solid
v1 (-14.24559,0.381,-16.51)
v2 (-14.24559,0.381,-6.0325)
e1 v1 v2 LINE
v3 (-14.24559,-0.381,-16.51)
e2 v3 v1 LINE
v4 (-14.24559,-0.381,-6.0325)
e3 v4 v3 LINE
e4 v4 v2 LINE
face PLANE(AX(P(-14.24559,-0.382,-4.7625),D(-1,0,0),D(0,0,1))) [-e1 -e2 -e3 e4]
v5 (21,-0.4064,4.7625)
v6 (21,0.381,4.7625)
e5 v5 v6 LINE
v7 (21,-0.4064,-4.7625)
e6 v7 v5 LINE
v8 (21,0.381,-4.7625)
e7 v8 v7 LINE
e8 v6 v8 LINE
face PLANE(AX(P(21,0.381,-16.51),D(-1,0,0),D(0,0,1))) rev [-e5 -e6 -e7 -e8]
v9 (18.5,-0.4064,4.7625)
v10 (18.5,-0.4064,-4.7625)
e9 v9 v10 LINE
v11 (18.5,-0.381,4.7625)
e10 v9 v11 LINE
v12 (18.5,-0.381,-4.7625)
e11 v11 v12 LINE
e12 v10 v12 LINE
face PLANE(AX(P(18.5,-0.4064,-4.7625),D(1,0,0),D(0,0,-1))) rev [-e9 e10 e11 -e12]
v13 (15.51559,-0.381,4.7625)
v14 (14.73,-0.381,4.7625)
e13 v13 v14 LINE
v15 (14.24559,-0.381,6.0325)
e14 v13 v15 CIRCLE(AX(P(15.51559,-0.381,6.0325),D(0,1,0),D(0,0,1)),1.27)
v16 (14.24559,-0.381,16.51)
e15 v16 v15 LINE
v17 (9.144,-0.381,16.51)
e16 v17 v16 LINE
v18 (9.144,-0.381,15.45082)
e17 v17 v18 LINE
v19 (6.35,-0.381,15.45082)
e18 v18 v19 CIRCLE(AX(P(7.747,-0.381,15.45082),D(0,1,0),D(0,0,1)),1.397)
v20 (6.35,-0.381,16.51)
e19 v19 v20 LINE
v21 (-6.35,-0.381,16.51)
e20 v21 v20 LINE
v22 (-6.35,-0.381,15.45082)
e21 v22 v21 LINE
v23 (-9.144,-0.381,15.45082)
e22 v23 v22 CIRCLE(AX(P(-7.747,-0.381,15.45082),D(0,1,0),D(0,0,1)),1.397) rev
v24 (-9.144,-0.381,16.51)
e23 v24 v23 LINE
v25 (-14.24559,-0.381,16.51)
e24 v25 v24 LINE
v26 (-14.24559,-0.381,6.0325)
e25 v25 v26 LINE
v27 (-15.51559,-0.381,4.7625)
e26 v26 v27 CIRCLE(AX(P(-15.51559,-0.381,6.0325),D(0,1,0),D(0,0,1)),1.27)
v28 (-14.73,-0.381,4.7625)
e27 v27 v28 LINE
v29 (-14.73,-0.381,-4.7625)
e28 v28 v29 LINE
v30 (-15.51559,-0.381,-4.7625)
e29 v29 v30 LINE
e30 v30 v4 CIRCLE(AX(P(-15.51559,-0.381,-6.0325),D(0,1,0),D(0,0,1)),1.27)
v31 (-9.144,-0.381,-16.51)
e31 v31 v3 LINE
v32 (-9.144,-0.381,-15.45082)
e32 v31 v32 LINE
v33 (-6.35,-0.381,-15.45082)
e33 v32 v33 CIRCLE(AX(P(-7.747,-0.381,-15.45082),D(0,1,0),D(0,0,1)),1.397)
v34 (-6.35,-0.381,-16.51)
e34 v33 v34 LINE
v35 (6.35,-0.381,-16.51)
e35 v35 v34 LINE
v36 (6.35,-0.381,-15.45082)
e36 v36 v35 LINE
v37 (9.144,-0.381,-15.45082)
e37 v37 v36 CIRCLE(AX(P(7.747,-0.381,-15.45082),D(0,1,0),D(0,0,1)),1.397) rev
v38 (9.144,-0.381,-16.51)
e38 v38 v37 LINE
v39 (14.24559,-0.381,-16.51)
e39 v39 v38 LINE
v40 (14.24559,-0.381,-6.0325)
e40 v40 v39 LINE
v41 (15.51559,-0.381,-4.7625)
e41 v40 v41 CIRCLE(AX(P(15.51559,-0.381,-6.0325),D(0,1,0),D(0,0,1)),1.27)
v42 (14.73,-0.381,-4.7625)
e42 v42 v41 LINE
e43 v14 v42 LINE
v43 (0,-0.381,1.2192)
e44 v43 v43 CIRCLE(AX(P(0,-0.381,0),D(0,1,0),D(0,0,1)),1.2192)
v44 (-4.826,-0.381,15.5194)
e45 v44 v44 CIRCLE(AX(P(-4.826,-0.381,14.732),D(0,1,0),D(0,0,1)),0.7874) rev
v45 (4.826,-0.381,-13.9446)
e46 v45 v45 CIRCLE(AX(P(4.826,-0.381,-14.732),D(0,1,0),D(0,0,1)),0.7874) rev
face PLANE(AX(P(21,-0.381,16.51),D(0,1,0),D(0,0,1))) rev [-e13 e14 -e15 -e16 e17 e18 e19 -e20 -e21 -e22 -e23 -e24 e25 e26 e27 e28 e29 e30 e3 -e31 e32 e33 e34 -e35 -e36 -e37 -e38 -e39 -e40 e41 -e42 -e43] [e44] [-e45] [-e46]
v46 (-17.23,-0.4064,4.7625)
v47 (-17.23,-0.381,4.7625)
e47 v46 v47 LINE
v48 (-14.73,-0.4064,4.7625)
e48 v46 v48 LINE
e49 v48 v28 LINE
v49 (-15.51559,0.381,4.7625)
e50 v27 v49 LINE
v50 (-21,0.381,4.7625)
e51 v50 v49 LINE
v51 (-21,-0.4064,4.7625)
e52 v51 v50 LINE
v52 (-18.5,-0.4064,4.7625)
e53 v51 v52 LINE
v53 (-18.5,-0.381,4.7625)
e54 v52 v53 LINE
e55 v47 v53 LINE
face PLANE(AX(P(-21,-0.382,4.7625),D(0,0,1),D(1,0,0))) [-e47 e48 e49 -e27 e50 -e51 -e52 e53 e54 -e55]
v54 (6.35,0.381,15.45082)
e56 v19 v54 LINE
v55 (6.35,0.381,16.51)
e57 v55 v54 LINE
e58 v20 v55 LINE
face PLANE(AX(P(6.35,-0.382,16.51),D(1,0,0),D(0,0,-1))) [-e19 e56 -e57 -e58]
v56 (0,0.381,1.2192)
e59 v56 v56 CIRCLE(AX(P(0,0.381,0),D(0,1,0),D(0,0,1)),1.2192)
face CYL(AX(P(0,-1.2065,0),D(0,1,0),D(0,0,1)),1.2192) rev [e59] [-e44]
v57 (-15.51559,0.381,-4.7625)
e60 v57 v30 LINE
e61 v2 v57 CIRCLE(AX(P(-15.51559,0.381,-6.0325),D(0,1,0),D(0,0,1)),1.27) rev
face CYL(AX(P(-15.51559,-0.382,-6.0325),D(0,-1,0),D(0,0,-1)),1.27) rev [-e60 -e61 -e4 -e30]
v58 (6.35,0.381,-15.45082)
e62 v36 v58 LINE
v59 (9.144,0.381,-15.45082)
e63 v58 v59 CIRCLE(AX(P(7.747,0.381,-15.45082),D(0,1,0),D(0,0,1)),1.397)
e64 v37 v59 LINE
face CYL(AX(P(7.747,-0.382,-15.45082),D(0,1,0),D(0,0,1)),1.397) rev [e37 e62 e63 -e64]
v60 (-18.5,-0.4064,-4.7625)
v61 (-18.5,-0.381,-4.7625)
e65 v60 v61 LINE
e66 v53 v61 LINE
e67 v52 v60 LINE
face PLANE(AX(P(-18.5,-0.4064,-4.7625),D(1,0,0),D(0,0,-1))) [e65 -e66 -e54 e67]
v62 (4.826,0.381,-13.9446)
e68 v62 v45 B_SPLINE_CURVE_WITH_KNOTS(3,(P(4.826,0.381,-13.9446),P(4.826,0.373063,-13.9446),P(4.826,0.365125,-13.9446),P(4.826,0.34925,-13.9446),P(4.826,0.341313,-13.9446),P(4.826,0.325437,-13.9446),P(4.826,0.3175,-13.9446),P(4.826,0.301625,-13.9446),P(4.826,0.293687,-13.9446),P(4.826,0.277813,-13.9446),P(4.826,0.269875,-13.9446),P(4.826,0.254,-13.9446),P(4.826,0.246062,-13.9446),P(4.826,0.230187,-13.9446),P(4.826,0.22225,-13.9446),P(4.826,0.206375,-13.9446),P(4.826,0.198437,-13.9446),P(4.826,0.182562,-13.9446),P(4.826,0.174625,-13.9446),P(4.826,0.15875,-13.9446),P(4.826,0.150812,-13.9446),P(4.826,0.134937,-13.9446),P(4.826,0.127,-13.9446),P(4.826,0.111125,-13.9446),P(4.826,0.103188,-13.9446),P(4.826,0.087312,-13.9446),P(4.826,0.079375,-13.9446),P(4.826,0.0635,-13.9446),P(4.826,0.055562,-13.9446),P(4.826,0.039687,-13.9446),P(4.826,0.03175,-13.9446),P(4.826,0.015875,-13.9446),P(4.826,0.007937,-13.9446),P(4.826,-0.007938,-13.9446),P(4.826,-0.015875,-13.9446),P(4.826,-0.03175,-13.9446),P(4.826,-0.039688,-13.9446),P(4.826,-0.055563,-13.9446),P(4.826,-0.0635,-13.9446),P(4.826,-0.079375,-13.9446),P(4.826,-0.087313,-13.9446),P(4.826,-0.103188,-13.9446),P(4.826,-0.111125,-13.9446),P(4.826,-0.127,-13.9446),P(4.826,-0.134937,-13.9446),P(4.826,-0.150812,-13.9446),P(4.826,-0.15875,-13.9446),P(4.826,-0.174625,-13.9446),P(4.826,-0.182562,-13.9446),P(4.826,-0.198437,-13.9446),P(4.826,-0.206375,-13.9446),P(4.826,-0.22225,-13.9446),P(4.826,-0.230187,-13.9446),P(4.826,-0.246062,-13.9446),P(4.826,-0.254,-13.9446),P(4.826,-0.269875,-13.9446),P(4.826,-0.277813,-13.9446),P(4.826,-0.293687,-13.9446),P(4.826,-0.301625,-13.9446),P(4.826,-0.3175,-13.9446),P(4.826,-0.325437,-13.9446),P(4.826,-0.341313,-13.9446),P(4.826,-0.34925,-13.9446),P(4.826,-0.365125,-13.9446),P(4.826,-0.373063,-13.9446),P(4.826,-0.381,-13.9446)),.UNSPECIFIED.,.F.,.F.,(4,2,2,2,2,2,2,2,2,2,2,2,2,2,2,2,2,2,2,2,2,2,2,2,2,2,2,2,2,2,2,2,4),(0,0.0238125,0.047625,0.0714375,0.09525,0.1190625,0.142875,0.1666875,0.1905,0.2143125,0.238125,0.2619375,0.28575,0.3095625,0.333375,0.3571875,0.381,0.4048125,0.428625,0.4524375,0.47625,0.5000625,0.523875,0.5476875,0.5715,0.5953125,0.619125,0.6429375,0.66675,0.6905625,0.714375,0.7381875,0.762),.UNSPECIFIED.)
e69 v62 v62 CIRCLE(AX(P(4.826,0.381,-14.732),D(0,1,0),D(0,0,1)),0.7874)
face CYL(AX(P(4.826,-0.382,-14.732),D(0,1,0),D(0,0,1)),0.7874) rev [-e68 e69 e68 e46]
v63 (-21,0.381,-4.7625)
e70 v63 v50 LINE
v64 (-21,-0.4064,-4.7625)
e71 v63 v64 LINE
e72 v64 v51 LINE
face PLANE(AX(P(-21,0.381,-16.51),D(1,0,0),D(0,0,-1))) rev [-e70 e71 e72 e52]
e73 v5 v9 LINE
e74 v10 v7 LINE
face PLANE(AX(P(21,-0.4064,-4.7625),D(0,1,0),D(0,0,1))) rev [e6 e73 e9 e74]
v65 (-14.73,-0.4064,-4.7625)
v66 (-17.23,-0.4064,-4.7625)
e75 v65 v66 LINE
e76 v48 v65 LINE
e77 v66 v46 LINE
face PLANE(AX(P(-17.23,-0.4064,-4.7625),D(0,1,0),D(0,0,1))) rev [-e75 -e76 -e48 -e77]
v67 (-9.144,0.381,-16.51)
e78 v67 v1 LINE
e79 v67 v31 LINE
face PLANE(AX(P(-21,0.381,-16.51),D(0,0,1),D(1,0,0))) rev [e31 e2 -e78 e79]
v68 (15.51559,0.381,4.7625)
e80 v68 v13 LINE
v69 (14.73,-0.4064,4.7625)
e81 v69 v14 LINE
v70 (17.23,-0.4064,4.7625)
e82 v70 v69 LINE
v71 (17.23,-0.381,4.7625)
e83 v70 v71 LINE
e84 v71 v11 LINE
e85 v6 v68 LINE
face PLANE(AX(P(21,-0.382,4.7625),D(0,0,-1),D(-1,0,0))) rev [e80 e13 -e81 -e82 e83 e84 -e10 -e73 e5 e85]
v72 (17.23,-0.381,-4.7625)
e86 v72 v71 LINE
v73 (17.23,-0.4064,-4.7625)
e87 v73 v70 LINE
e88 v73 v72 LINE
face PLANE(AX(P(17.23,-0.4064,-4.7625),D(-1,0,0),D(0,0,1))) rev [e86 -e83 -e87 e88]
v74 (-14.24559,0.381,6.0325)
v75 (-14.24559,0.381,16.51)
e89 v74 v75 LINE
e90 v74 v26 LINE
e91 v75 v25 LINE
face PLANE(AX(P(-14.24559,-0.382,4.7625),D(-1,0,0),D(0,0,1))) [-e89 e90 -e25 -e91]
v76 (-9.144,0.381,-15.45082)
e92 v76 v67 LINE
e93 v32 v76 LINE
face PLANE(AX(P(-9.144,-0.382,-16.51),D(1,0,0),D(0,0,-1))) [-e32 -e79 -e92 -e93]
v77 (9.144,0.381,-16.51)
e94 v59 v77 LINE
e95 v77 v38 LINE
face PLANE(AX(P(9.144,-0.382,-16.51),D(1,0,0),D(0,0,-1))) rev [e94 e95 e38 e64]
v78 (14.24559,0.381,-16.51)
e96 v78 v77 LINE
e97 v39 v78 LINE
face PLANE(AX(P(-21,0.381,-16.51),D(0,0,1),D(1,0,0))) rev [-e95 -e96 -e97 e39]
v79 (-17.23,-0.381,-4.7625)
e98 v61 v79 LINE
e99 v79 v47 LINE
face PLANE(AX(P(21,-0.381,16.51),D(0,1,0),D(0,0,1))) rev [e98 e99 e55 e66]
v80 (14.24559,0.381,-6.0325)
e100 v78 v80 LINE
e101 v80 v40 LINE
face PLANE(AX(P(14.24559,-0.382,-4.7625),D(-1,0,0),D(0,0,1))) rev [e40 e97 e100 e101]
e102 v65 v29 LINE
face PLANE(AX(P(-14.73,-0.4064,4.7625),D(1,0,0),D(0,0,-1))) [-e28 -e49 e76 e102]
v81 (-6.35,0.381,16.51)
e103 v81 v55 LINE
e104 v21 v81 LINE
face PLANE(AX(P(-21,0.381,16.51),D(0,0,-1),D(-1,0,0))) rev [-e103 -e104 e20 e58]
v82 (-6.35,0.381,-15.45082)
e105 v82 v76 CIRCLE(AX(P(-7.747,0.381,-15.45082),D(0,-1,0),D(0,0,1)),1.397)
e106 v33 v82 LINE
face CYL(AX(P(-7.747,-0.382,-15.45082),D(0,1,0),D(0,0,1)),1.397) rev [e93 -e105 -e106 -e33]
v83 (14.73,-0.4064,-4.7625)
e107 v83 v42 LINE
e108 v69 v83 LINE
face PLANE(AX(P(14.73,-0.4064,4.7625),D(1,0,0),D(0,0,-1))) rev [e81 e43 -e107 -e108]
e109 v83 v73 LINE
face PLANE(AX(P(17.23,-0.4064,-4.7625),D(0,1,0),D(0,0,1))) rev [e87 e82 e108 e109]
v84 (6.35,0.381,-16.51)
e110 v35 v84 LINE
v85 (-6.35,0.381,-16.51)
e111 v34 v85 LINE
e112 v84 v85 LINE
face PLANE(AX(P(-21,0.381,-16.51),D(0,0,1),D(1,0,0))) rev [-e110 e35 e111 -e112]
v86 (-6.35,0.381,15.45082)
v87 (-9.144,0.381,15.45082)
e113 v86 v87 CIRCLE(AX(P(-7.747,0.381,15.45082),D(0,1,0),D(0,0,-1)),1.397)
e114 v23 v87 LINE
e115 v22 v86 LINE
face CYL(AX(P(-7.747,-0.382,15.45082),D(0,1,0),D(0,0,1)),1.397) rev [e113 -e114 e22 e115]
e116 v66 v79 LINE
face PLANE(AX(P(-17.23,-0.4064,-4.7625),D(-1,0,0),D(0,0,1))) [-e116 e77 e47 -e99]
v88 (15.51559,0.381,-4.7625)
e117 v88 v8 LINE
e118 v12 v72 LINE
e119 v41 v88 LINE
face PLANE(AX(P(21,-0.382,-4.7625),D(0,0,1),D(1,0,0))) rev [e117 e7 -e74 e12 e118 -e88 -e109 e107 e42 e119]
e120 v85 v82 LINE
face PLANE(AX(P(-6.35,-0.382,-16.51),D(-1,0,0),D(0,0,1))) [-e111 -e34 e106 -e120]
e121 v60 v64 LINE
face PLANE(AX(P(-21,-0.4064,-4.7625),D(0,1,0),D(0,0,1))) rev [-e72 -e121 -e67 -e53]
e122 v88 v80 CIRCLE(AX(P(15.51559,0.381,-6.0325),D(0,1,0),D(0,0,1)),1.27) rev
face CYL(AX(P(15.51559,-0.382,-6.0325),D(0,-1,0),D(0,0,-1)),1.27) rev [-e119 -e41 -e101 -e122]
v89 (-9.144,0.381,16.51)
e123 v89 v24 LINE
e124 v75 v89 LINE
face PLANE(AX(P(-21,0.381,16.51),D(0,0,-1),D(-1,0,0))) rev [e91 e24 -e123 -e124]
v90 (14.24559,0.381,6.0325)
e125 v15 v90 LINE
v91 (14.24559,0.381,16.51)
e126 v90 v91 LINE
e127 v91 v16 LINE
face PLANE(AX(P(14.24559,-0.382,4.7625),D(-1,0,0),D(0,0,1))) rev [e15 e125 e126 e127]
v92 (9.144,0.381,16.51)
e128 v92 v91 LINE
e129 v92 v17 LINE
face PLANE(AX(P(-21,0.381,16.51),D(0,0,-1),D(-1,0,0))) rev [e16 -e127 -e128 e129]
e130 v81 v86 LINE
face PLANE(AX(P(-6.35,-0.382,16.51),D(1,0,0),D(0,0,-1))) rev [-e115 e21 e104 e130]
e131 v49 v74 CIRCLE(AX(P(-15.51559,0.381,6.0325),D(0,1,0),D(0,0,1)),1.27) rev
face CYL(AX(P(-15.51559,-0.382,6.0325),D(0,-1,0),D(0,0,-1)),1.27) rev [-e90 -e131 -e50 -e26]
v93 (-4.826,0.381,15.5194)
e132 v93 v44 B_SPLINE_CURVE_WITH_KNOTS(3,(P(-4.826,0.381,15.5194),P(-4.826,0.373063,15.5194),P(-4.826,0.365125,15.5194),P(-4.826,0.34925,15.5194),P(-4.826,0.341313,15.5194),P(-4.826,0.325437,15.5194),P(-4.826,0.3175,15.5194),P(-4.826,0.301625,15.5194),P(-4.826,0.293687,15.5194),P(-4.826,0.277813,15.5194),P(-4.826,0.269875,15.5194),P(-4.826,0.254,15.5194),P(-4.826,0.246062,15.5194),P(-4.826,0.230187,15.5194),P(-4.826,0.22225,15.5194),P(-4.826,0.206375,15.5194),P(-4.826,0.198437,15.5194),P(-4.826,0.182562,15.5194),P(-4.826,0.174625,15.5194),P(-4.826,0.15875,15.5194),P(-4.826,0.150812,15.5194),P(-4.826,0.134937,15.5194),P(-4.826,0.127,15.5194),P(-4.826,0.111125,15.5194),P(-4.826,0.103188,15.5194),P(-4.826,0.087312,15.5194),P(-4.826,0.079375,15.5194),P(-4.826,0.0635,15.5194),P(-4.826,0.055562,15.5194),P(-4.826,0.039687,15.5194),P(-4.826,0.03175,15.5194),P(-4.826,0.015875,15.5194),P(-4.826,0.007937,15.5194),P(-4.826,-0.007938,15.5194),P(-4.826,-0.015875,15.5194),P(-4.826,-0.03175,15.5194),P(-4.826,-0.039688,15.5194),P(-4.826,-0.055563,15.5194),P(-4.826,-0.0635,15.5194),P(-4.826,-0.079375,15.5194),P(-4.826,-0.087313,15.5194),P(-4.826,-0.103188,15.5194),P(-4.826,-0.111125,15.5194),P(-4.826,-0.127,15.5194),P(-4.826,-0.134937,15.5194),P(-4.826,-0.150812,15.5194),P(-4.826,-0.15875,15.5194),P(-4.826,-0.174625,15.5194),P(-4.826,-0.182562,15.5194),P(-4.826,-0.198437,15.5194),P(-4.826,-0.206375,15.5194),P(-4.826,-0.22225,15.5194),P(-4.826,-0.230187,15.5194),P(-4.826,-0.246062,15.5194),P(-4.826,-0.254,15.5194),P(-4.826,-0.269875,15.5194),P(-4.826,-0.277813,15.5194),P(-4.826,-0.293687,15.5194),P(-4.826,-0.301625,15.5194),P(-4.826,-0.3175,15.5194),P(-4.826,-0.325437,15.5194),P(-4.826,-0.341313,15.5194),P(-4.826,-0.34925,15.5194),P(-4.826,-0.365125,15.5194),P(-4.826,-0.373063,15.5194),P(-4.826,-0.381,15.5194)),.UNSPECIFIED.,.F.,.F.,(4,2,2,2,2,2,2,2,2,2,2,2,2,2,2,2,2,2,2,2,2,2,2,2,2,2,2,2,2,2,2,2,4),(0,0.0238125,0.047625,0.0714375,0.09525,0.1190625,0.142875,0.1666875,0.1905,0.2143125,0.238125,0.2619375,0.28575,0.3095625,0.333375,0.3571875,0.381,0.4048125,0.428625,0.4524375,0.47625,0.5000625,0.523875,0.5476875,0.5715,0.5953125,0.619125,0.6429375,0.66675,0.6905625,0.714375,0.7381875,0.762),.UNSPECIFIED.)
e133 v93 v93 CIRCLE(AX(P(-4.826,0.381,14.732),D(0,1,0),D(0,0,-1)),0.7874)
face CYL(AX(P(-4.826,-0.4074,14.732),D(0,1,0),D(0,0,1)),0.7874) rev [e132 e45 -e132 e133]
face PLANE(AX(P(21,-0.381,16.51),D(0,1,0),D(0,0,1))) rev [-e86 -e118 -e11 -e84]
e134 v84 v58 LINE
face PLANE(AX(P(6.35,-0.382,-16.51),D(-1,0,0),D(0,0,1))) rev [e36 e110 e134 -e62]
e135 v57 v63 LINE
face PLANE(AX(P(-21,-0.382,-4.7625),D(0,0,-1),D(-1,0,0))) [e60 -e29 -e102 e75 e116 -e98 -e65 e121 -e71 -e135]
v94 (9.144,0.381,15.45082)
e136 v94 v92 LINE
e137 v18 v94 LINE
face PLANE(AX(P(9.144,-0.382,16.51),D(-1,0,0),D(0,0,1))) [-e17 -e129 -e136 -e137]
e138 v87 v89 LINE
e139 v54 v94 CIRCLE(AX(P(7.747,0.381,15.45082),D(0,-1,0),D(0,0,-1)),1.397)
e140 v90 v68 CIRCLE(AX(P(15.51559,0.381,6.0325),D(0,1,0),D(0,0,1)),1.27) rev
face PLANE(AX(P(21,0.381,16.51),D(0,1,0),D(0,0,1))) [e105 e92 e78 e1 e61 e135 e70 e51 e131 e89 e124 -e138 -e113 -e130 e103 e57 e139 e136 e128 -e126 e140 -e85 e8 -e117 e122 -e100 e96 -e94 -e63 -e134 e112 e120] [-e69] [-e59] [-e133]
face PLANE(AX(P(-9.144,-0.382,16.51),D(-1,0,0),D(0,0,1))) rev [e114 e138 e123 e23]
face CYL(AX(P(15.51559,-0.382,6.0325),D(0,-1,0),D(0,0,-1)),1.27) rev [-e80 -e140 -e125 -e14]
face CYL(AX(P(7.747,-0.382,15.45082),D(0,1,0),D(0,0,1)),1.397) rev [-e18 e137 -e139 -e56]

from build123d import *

# Parameters (mm, degrees)
SKETCH1_W            = 42
SKETCH1_H            = 33.02
BOSS_EXTRUDE1_DEPTH  = 0.381
SKETCH3_R            = 1.2192
CUT_EXTRUDE2_DEPTH   = 1.5875
CUT_EXTRUDE1_REACH   = 28.724
CUT_EXTRUDE3_START   = -0.762
CUT_EXTRUDE3_DEPTH   = 0.762
FILLET1_R            = 1.27
CUT_EXTRUDE4_REACH   = 28.724
SKETCH7_R            = 0.7874
FILLET1_OF_MIRROR1_R = 1.27
MIRROR2_START        = -0.381
MIRROR2_DEPTH        = 0.762
SKETCH6_W            = 2.5
SKETCH6_H            = 9.525
BOSS_EXTRUDE2_DEPTH  = 0.0254
CIRPATTERN1_COUNT    = 2


# Read off the part's stored shape, not the designer's step: Mirror2
with BuildPart() as part:
    # Sketch1 → Boss-Extrude1 (new, symmetric)
    with BuildSketch(Plane(origin=(0, 0, 0), x_dir=(1, 0, 0), z_dir=(0, 1, 0))):
        Rectangle(SKETCH1_W, SKETCH1_H)
    extrude(amount=BOSS_EXTRUDE1_DEPTH, both=True)

    # Sketch3 → Cut-Extrude2 (cut)
    with BuildSketch(Plane(origin=(0, 0.381, 0), x_dir=(1, 0, 0), z_dir=(0, 1, 0))):
        with Locations(Location((0, 0, 0), (0, 0, 270))):
            Circle(SKETCH3_R)
    extrude(amount=-CUT_EXTRUDE2_DEPTH, mode=Mode.SUBTRACT)

    # Sketch2 → Cut-Extrude1 (cut, up to next)
    with BuildSketch(Plane(origin=(0, 0.381, 0), x_dir=(1, 0, 0), z_dir=(0, 1, 0)), mode=Mode.PRIVATE) as cut_extrude1_sk1:
        with BuildLine():
            Line((9.144, 16.51), (9.144, 15.45082))
            ThreePointArc((9.144, 15.45082), (7.747, 14.05382), (6.35, 15.45082))
            Line((6.35, 15.45082), (6.35, 16.51))
            ThreePointArc((6.35, 16.51), (7.747, 17.907), (9.144, 16.51))
        make_face()
    cut_extrude1_tool1 = extrude(cut_extrude1_sk1.sketch, amount=-CUT_EXTRUDE1_REACH, mode=Mode.PRIVATE) & part.part
    cut_extrude1 = cut_extrude1_tool1.solids().sort_by_distance((7.747, 0.381, -15.98041))[0]
    add(cut_extrude1, mode=Mode.SUBTRACT)

    # Sketch5 → Cut-Extrude3 (cut)
    with BuildSketch(Plane(origin=(0, 0.381, 0), x_dir=(1, 0, 0), z_dir=(0, 1, 0)).offset(CUT_EXTRUDE3_START)):
        Polygon((21, 4.7625), (21, -4.7625), (14.24559, -4.7625), (14.24559, -19.569767896), (25.307623141, -19.569767896), (25.307623141, 18.786679146), (14.24559, 18.786679146), (14.24559, 4.7625), align=None)
    cut_extrude3 = extrude(amount=CUT_EXTRUDE3_DEPTH, mode=Mode.SUBTRACT)

    # Fillet1
    fillet1_edges = [part.edges().sort_by_distance(p)[0] for p in [
        (14.24559, 0, 4.7625),
        (14.24559, 0, -4.7625),
    ]]
    fillet(fillet1_edges, radius=FILLET1_R)

    # Sketch7 → Cut-Extrude4 (cut, up to next)
    with BuildSketch(Plane(origin=(0, 0.381, 0), x_dir=(1, 0, 0), z_dir=(0, 1, 0)), mode=Mode.PRIVATE) as cut_extrude4_sk1:
        with Locations(Location((4.826, 14.732, 0), (0, 0, 270))):
            Circle(SKETCH7_R)
    cut_extrude4_tool1 = extrude(cut_extrude4_sk1.sketch, amount=-CUT_EXTRUDE4_REACH, mode=Mode.PRIVATE) & part.part
    cut_extrude4 = cut_extrude4_tool1.solids().sort_by_distance((4.826, 0.381, -14.732))[0]
    add(cut_extrude4, mode=Mode.SUBTRACT)

    # Mirror1: Cut-Extrude1, Cut-Extrude3 across plane
    add(cut_extrude1.mirror(Plane(origin=(0, 0, 0), x_dir=(0, 0, 1), z_dir=(1, 0, 0))), mode=Mode.SUBTRACT)
    add(cut_extrude3.mirror(Plane(origin=(0, 0, 0), x_dir=(0, 0, 1), z_dir=(1, 0, 0))), mode=Mode.SUBTRACT)

    # Fillet1 of Mirror1
    fillet1_of_mirror1_edges = [part.edges().sort_by_distance(p)[0] for p in [
        (-14.24559, 0, 4.7625),
        (-14.24559, 0, -4.7625),
    ]]
    fillet(fillet1_of_mirror1_edges, radius=FILLET1_OF_MIRROR1_R)

    # Mirror2 outline → Mirror2 (cut)
    with BuildSketch(Plane(origin=(0, 0, 0), x_dir=(1, 0, 0), z_dir=(0, 1, 0)).offset(MIRROR2_START)):
        with BuildLine():
            Line((-9.144, -16.51), (-6.35, -16.51))
            Line((-6.35, -16.51), (-6.35, -15.45082))
            ThreePointArc((-6.35, -15.45082), (-7.747, -14.05382), (-9.144, -15.45082))
            Line((-9.144, -15.45082), (-9.144, -16.51))
        make_face()
        with BuildLine():
            Line((9.144, -16.51), (9.144, -15.45082))
            ThreePointArc((9.144, -15.45082), (7.747, -14.05382), (6.35, -15.45082))
            Line((6.35, -15.45082), (6.35, -16.51))
            Line((6.35, -16.51), (9.144, -16.51))
        make_face()
    extrude(amount=MIRROR2_DEPTH, mode=Mode.SUBTRACT)

    # Sketch6 → Boss-Extrude2 (add)
    with BuildSketch(Plane(origin=(0, -0.381, 0), x_dir=(1, 0, 0), z_dir=(0, 1, 0))):
        with Locations((-19.75, 0)):
            Rectangle(SKETCH6_W, SKETCH6_H)
        with Locations((-15.98, 0)):
            Rectangle(SKETCH6_W, SKETCH6_H)
    boss_extrude2 = extrude(amount=-BOSS_EXTRUDE2_DEPTH)

    # Mirror3: Boss-Extrude2 across plane
    add(boss_extrude2.mirror(Plane(origin=(0, 0, 0), x_dir=(0, 0, 1), z_dir=(1, 0, 0))))

    # CirPattern1: Cut-Extrude4 ×2 about axis
    cirpattern1_axis = Axis((0, 0, 0), (0, 1, 0))
    for i in range(1, CIRPATTERN1_COUNT):
        add(cut_extrude4.rotate(cirpattern1_axis, i * 360 / CIRPATTERN1_COUNT), mode=Mode.SUBTRACT)


solid = part.part
